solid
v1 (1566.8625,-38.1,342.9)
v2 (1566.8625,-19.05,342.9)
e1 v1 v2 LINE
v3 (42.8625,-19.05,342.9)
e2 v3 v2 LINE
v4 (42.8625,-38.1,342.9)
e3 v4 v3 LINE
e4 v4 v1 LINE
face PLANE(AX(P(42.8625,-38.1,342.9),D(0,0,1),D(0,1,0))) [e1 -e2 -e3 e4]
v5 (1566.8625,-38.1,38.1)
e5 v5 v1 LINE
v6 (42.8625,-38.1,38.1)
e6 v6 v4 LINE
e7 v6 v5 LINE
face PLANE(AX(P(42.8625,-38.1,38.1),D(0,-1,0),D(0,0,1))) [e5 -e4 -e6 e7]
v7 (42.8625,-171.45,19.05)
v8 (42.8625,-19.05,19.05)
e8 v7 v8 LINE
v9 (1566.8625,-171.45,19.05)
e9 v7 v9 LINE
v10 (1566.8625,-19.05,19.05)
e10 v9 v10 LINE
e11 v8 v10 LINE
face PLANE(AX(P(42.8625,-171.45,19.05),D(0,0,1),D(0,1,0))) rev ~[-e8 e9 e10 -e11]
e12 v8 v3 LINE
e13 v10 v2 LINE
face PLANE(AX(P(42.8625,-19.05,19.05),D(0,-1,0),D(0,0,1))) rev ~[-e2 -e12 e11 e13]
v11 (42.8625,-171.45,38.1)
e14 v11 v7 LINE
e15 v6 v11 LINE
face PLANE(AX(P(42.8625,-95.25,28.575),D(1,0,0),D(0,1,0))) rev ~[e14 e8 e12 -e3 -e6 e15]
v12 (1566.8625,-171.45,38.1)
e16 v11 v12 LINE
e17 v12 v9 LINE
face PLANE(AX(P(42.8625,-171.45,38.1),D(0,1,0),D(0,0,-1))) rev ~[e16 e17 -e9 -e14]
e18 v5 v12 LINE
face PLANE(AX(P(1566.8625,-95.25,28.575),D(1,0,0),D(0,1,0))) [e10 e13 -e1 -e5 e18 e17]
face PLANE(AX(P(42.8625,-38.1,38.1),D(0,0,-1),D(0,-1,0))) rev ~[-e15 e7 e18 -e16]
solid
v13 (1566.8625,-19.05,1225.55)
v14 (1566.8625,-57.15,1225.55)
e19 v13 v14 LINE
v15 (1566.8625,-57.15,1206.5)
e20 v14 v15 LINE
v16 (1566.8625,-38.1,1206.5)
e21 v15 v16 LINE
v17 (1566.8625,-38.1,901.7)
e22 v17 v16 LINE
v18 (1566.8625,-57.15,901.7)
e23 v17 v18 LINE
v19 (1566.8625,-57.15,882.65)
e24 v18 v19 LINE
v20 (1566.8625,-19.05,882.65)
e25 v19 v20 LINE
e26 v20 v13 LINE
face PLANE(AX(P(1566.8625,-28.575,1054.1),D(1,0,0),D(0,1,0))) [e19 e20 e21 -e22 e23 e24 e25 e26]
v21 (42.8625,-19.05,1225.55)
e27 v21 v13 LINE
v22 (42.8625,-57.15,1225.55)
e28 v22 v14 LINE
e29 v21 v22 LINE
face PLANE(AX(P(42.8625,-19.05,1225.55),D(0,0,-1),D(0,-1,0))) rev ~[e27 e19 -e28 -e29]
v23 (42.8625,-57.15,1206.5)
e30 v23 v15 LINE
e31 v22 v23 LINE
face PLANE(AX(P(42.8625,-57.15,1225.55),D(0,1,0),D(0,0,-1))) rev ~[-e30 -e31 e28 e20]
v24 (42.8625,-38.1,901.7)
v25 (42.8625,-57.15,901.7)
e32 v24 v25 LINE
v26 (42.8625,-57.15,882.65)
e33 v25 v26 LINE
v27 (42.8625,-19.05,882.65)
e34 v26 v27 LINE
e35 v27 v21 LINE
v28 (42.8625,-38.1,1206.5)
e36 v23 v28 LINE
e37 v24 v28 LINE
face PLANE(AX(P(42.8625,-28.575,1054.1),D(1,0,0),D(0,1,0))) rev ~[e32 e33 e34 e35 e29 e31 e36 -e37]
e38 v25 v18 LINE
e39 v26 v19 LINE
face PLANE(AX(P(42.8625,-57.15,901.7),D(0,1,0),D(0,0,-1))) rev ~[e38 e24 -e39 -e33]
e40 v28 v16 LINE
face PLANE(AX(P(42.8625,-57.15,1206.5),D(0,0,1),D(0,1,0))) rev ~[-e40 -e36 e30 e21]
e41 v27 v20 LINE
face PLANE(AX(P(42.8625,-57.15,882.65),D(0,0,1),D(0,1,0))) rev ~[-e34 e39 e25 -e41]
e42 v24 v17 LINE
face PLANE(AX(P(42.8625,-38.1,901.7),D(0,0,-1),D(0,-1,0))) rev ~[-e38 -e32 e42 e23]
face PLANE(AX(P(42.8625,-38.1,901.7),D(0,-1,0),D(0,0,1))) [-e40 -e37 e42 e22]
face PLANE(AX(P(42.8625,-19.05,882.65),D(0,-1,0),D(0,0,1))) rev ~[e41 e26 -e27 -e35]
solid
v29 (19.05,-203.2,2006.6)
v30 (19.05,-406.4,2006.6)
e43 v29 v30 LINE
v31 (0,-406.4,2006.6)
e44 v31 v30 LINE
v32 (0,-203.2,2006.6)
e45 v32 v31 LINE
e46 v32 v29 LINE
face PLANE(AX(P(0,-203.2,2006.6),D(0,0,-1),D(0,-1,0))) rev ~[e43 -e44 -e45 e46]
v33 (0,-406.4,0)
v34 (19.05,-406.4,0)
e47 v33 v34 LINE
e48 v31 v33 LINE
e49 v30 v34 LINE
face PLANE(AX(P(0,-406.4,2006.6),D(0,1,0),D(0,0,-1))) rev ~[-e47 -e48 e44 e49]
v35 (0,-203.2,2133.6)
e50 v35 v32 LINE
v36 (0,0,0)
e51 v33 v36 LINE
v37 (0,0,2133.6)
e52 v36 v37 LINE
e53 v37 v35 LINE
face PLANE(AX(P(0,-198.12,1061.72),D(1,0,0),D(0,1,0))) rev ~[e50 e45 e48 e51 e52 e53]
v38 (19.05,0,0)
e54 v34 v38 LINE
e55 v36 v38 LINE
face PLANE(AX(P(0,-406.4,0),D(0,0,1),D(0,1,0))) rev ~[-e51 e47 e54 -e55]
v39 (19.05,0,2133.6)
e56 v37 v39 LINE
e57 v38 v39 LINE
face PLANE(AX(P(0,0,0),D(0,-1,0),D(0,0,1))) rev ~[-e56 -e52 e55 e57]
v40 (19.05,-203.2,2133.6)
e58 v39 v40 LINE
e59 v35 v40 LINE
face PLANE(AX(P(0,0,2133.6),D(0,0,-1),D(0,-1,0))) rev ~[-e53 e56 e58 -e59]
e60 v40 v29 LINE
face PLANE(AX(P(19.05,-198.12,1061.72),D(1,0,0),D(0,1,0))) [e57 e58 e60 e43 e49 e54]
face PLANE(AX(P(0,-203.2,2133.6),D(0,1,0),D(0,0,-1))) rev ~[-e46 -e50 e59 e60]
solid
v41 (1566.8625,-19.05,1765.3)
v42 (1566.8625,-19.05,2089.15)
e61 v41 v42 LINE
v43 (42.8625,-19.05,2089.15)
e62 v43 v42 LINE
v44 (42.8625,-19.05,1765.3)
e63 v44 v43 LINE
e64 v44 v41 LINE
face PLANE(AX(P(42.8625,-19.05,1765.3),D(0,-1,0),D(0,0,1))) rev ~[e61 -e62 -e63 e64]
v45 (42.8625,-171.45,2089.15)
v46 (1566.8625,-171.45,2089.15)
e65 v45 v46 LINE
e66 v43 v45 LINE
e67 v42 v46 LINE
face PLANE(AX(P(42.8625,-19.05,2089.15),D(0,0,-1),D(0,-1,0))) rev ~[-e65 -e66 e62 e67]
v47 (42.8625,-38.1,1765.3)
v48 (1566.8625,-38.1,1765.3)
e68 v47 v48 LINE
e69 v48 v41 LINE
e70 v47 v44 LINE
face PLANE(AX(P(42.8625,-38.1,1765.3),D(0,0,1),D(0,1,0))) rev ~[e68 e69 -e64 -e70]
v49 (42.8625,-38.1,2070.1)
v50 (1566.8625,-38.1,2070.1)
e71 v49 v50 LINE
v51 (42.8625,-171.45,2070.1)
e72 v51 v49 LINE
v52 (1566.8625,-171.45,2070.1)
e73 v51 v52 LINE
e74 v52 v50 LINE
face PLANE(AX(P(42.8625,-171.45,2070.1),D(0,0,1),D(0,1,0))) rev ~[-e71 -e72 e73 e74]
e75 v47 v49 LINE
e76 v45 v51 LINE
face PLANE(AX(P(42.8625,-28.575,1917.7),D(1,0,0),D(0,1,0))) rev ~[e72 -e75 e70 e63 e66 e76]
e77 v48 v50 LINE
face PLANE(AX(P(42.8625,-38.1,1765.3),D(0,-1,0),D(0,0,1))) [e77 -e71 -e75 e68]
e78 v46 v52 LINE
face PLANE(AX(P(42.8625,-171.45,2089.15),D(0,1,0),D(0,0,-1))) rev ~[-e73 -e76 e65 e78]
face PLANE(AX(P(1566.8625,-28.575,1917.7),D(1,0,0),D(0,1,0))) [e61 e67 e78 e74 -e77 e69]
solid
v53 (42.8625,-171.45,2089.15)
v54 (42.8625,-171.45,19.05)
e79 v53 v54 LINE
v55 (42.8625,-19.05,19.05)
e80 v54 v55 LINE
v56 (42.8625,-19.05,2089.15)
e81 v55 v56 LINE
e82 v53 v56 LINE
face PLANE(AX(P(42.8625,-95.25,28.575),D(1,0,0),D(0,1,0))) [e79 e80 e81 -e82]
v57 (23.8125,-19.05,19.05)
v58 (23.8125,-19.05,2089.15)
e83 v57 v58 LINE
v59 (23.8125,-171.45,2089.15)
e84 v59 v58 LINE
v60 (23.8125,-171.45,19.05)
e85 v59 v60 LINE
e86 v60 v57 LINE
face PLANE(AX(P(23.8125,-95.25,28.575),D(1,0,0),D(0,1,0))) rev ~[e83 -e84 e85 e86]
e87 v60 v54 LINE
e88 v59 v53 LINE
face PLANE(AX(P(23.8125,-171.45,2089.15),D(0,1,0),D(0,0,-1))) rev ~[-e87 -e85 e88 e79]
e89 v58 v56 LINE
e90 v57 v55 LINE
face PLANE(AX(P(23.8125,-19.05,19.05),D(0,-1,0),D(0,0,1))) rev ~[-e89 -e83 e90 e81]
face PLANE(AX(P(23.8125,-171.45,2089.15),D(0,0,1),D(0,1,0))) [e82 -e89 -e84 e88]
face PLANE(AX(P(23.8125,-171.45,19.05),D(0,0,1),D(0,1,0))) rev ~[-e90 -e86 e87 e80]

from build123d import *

# Parameters (mm, degrees)
F1_DEPTH = 19.05
F3_W     = 152.4
F3_H     = 19.05
F3_H_2   = 2032
F4_DEPTH = 19.05
F5_W     = 19.05
F5_H     = 304.8
F6_DEPTH = 1524


# Not quite as in the source:
# - a length typed as a fraction of an inch, garbled in the dataset ("3 / 203.2 mm" for 3/8 in), is restored
# - the program builds the solid bodies; features that only make, move or delete a surface that nothing else refers to are left out


with BuildPart() as f1:
    # F0 (on Right) → F1 (new body)
    with BuildSketch(Plane.YZ):
        Polygon((-406.4, 0), (0, 0), (0, 2133.6), (-203.2, 2133.6), (-203.2, 2006.6), (-406.4, 2006.6), align=None)
    extrude(amount=F1_DEPTH)


with BuildPart() as f4:
    # F3 (on offset) → F4 (new body)
    with BuildSketch(Plane.YZ.offset(23.8125)):
        with Locations((-95.25, 28.575)):
            Rectangle(F3_W, F3_H)
        with Locations((-95.25, 1054.1)):
            Rectangle(F3_W, F3_H_2)
        with Locations((-95.25, 2079.625)):
            Rectangle(F3_W, F3_H)
    extrude(amount=F4_DEPTH)


with BuildPart() as f6:
    # F5 (on face) → F6 (new body)
    with BuildSketch(Plane.YZ.offset(42.8625)):
        with Locations((-28.575, 1917.7)):
            Rectangle(F5_W, F5_H)
        Polygon((-38.1, 2070.1), (-19.05, 2070.1), (-19.05, 2089.15), (-171.45, 2089.15), (-171.45, 2070.1), align=None)
    extrude(amount=F6_DEPTH)


with BuildPart() as f6b:
    # F5 (on face) → F6, piece 2 (new body)
    with BuildSketch(Plane.YZ.offset(42.8625)):
        Polygon((-19.05, 19.05), (-19.05, 38.1), (-38.1, 38.1), (-171.45, 38.1), (-171.45, 19.05), align=None)
        with Locations((-28.575, 190.5)):
            Rectangle(F5_W, F5_H)
    extrude(amount=F6_DEPTH)


with BuildPart() as f6c:
    # F5 (on face) → F6, piece 3 (new body)
    with BuildSketch(Plane.YZ.offset(42.8625)):
        with Locations((-28.575, 1054.1)):
            Rectangle(F5_W, F5_H)
        Polygon((-38.1, 1206.5), (-19.05, 1206.5), (-19.05, 1225.55), (-57.15, 1225.55), (-57.15, 1206.5), align=None)
        Polygon((-19.05, 882.65), (-19.05, 901.7), (-38.1, 901.7), (-57.15, 901.7), (-57.15, 882.65), align=None)
    extrude(amount=F6_DEPTH)


solid = Compound([f1.part, f4.part, f6.part, f6b.part, f6c.part])
